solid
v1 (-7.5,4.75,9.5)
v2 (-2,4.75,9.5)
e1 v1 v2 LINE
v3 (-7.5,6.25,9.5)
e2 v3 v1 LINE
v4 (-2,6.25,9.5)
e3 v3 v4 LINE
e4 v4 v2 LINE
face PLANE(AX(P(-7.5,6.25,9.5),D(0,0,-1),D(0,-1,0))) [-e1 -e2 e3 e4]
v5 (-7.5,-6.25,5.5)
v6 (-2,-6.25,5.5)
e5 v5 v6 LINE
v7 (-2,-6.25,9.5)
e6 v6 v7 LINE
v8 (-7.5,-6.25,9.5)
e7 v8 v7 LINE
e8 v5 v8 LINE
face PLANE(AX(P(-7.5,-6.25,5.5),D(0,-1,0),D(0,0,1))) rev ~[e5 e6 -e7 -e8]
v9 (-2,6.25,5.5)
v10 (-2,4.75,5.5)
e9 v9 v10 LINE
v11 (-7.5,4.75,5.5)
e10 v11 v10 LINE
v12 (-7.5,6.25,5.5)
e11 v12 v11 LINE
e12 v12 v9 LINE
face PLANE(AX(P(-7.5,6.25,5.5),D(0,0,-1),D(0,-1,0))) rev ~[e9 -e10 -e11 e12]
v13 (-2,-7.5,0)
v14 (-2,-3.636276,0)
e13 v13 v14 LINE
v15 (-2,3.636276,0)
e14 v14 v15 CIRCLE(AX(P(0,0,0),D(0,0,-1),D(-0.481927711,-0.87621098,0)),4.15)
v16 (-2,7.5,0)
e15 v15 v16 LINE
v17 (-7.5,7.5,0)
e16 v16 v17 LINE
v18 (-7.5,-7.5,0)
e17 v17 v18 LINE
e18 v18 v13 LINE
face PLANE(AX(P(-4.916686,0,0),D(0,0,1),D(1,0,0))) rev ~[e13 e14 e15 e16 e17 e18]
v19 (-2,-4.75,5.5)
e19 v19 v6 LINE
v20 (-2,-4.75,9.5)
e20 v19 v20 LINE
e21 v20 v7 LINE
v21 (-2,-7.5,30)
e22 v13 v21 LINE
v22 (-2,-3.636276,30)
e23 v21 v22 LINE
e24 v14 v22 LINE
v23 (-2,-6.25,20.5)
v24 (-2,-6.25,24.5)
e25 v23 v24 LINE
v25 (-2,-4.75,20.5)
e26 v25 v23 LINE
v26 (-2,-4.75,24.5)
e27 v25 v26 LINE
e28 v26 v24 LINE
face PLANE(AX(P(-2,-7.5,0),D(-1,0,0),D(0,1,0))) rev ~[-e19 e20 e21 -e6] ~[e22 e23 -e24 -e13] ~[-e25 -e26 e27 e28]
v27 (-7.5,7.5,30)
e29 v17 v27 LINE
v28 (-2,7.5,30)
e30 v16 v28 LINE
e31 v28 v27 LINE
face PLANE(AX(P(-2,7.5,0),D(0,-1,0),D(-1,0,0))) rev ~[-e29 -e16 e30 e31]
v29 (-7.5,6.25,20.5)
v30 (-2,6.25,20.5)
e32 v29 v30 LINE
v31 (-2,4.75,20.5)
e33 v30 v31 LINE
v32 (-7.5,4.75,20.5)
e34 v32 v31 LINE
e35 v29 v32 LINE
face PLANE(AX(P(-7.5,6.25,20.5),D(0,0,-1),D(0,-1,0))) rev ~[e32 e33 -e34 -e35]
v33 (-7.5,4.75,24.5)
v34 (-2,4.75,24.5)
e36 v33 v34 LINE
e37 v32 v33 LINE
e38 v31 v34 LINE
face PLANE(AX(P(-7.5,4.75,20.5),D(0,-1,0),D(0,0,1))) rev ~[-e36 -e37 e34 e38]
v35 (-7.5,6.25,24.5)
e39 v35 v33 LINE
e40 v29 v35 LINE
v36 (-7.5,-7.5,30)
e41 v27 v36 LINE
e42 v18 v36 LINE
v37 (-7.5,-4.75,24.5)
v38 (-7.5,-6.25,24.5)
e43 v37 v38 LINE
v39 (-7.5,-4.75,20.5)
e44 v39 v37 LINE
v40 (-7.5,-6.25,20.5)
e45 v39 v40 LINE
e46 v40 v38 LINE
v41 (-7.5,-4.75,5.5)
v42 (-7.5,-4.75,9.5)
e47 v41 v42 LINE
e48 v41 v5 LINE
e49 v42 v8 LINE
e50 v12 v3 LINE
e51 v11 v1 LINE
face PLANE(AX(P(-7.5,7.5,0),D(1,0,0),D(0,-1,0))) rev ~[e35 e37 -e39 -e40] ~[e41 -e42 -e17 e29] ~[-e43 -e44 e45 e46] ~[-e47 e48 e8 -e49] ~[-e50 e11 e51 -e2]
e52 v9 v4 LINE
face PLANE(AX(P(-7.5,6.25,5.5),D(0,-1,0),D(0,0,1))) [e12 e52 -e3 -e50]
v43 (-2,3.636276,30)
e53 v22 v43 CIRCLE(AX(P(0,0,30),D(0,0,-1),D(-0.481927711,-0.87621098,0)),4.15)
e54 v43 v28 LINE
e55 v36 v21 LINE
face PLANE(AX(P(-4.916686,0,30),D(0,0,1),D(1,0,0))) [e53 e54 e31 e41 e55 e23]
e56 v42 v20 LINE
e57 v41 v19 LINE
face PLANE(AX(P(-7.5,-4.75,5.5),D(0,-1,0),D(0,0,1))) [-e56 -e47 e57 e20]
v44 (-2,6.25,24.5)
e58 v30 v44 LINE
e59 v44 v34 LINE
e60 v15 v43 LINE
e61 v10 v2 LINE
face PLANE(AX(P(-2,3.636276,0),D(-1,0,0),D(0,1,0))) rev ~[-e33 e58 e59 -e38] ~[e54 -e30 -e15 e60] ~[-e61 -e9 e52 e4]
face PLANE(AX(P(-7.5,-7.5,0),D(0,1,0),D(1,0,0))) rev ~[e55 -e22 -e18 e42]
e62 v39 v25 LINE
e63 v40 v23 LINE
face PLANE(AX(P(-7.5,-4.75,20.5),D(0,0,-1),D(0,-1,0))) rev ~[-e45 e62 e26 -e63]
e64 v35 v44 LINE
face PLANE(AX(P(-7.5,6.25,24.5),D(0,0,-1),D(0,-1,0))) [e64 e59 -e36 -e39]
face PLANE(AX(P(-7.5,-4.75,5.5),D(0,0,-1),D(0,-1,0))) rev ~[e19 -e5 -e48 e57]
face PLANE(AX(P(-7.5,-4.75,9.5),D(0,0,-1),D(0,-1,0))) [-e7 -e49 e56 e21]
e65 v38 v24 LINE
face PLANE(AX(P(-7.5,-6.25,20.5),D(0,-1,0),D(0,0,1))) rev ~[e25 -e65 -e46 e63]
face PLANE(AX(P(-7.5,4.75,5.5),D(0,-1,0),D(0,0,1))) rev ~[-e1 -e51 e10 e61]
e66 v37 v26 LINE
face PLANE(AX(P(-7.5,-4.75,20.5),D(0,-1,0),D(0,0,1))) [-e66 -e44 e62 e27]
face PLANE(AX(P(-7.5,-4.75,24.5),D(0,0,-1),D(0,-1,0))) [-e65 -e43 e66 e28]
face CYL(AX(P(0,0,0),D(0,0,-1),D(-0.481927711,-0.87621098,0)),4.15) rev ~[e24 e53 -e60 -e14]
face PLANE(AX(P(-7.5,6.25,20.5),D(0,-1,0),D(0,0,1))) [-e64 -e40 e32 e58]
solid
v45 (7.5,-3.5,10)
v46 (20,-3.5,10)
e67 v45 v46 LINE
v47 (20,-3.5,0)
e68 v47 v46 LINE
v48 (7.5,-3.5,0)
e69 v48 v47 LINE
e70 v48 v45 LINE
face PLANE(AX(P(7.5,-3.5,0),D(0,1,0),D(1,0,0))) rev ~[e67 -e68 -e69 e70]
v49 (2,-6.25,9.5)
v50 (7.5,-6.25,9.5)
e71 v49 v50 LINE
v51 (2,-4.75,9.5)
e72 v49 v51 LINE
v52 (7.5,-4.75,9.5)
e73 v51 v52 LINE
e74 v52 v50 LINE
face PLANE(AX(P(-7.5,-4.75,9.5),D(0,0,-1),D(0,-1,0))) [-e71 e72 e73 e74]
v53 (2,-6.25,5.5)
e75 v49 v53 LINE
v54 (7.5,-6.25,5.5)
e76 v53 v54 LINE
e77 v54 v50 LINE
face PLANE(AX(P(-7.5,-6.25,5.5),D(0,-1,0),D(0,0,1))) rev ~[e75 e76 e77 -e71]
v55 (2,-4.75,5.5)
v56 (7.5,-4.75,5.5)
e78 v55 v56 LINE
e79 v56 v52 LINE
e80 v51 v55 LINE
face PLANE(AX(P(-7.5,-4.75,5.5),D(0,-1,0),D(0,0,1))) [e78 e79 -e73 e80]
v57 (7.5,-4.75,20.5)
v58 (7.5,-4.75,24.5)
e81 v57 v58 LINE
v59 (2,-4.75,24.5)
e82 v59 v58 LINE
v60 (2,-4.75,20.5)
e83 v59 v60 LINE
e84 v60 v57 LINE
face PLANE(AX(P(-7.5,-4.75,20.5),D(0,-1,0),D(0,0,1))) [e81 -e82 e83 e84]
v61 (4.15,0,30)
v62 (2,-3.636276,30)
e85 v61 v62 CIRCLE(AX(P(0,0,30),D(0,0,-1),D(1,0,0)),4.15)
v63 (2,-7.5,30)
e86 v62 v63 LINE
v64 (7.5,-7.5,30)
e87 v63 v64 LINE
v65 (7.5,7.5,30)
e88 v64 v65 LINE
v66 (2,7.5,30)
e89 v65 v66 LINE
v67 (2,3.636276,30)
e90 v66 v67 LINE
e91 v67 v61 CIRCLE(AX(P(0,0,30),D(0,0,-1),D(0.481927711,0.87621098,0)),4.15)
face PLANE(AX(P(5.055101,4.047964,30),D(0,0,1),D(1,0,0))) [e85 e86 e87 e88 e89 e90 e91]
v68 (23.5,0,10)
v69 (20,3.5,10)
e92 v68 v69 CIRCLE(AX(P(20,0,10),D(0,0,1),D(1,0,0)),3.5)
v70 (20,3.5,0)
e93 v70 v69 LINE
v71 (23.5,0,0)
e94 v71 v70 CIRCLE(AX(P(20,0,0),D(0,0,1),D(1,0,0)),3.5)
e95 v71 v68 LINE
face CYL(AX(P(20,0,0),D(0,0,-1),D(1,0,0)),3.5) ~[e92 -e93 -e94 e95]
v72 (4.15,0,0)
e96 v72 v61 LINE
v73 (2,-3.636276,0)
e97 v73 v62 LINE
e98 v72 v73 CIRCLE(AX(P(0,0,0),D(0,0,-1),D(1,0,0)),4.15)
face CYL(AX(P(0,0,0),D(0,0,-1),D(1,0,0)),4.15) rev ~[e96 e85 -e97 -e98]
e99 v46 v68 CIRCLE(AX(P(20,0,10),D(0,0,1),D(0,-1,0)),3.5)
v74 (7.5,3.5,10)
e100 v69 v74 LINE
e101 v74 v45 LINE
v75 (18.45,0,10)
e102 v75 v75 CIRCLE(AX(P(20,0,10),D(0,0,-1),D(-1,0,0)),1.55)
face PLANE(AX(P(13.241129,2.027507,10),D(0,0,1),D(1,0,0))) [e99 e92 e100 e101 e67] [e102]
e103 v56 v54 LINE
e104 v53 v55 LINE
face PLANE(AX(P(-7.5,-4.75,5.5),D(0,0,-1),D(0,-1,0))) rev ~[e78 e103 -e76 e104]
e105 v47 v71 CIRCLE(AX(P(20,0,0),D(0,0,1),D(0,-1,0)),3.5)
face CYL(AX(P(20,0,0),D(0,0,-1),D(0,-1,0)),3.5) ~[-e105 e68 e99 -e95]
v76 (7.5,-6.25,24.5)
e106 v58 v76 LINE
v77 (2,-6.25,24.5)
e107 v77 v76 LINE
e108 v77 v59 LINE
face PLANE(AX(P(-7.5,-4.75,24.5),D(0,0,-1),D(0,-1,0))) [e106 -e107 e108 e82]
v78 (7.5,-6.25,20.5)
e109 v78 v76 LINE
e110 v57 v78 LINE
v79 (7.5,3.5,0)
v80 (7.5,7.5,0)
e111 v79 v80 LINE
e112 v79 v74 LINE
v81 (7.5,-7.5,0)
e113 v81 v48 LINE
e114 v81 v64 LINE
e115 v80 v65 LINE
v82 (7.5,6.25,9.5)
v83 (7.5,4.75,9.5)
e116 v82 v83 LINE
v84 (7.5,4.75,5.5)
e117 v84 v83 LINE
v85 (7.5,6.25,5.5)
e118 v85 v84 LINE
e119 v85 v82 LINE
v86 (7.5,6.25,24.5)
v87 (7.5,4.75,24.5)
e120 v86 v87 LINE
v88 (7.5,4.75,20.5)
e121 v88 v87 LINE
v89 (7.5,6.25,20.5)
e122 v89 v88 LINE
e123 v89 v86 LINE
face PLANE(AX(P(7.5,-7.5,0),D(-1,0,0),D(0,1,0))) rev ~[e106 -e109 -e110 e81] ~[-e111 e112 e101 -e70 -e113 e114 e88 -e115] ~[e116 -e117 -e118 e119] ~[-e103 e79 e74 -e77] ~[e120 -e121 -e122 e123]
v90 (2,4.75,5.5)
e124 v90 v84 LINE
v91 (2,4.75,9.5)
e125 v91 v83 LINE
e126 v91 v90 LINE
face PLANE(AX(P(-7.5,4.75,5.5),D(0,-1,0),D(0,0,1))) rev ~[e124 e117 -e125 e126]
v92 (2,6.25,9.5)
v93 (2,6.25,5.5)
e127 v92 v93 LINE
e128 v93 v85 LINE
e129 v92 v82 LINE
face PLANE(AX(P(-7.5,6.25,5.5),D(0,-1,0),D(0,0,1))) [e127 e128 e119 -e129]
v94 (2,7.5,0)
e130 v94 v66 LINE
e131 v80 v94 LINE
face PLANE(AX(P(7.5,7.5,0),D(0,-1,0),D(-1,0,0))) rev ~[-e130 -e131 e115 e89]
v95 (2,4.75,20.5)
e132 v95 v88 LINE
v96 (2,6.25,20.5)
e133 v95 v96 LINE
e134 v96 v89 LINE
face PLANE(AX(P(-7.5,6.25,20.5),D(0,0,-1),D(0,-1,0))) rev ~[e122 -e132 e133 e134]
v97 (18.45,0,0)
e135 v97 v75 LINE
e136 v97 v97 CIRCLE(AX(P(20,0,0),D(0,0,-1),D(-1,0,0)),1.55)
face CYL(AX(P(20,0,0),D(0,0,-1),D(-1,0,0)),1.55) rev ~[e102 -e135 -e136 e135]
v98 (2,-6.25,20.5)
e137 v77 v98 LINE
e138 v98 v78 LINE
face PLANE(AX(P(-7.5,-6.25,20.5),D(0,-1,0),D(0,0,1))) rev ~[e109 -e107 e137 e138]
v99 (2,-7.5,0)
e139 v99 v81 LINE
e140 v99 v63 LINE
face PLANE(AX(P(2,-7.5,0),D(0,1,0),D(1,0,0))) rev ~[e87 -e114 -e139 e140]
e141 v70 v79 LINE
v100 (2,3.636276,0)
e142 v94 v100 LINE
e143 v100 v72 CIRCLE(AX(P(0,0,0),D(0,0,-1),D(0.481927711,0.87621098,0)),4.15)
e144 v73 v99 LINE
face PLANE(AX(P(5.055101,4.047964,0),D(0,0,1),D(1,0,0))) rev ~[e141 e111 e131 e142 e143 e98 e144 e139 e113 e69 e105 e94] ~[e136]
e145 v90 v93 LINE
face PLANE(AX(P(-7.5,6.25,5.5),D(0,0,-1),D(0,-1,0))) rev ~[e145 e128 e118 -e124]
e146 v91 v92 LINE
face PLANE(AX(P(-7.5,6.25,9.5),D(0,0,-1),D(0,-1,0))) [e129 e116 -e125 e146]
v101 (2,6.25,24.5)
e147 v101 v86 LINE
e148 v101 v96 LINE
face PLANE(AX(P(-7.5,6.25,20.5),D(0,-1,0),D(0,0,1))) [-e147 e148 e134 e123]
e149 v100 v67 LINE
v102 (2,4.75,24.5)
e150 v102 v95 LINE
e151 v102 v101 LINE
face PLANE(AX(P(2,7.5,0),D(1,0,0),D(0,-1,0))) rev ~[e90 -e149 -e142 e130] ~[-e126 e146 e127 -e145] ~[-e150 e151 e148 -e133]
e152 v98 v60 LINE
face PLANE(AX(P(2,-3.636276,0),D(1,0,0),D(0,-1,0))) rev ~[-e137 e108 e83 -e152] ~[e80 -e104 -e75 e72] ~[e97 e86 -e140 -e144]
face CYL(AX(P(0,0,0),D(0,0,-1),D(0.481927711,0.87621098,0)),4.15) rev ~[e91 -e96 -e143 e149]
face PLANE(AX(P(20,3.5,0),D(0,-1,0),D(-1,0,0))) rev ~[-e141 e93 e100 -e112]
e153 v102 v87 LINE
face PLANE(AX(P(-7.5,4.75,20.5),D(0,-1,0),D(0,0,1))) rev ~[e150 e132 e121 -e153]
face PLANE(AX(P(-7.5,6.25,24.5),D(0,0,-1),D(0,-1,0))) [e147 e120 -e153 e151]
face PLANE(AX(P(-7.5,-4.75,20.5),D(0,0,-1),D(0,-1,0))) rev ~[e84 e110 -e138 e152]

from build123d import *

# Parameters (mm, degrees)
F1_DEPTH = 30
F2_W     = 1.5
F2_H     = 4
F3_DEPTH = 15
F4_DEPTH = 10


# Not quite as in the source:
# - a feature names something its author has since deleted; it is built from what else it names


with BuildPart() as f1:
    # F0 (on Top) → F1 (new body)
    with BuildSketch(Plane.XY):
        with BuildLine():
            ThreePointArc((-2, -3.6362755671), (-4.15, 0), (-2, 3.6362755671))
            Line((-2, 3.6362755671), (-2, 7.5))
            Line((-2, 7.5), (-7.5, 7.5))
            Line((-7.5, 7.5), (-7.5, -7.5))
            Line((-7.5, -7.5), (-2, -7.5))
            Line((-2, -7.5), (-2, -3.6362755671))
        make_face()
    extrude(amount=F1_DEPTH)


with BuildPart() as f1b:
    # F0 (on Top) → F1, piece 2 (new body)
    with BuildSketch(Plane.XY):
        with BuildLine():
            ThreePointArc((2, 3.6362755671), (3.572289182, 2.1121671335), (4.15, 0))
            Line((4.15, 0), (7.5, 0))
            Line((7.5, 0), (7.5, 3.5))
            Line((7.5, 3.5), (7.5, 7.5))
            Line((7.5, 7.5), (2, 7.5))
            Line((2, 7.5), (2, 3.6362755671))
        make_face()
        with BuildLine():
            Line((7.5, 0), (4.15, 0))
            ThreePointArc((4.15, 0), (3.572289182, -2.1121671335), (2, -3.6362755671))
            Line((2, -3.6362755671), (2, -7.5))
            Line((2, -7.5), (7.5, -7.5))
            Line((7.5, -7.5), (7.5, -3.5))
            Line((7.5, -3.5), (7.5, 0))
        make_face()
    extrude(amount=F1_DEPTH)


with BuildPart() as f3_tool:
    # F2 (on face) → F3 (new body, through all)
    with BuildSketch(Plane(origin=(-7.5, 0, 0), x_dir=(0, -1, 0), z_dir=(-1, 0, 0))):
        with Locations((-5.5, 22.5)):
            Rectangle(F2_W, F2_H)
        with Locations((-5.5, 7.5)):
            Rectangle(F2_W, F2_H)
        with Locations((5.5, 7.5)):
            Rectangle(F2_W, F2_H)
        with Locations((5.5, 22.5)):
            Rectangle(F2_W, F2_H)
    extrude(amount=-F3_DEPTH)


with BuildPart() as f1_1:
    add(f1.part)

    # F3: cut by f3_tool
    add(f3_tool.part, mode=Mode.SUBTRACT)


with BuildPart() as f1b_1:
    add(f1b.part)

    # F3: cut by f3_tool
    add(f3_tool.part, mode=Mode.SUBTRACT)

    # F0 (on Top) → F4 (join)
    with BuildSketch(Plane.XY):
        with BuildLine():
            Line((7.5, 3.5), (7.5, 0))
            Line((7.5, 0), (16.5, 0))
            ThreePointArc((16.5, 0), (17.5251262658, 2.4748737342), (20, 3.5))
            Line((20, 3.5), (7.5, 3.5))
        make_face()
        with BuildLine():
            ThreePointArc((20, 3.5), (17.5251262658, 2.4748737342), (16.5, 0))
            ThreePointArc((16.5, 0), (17.5251262658, -2.4748737342), (20, -3.5))
            ThreePointArc((20, -3.5), (22.4748737342, -2.4748737342), (23.5, 0))
            ThreePointArc((23.5, 0), (22.4748737342, 2.4748737342), (20, 3.5))
        make_face()
        with BuildLine():
            ThreePointArc((21.55, 0), (20, -1.55), (18.45, 0))
            ThreePointArc((18.45, 0), (20, 1.55), (21.55, 0))
        make_face(mode=Mode.SUBTRACT)
        with BuildLine():
            Line((16.5, 0), (7.5, 0))
            Line((7.5, 0), (7.5, -3.5))
            Line((7.5, -3.5), (20, -3.5))
            ThreePointArc((20, -3.5), (17.5251262658, -2.4748737342), (16.5, 0))
        make_face()
    extrude(amount=F4_DEPTH)


solid = Compound([f1_1.part, f1b_1.part])
